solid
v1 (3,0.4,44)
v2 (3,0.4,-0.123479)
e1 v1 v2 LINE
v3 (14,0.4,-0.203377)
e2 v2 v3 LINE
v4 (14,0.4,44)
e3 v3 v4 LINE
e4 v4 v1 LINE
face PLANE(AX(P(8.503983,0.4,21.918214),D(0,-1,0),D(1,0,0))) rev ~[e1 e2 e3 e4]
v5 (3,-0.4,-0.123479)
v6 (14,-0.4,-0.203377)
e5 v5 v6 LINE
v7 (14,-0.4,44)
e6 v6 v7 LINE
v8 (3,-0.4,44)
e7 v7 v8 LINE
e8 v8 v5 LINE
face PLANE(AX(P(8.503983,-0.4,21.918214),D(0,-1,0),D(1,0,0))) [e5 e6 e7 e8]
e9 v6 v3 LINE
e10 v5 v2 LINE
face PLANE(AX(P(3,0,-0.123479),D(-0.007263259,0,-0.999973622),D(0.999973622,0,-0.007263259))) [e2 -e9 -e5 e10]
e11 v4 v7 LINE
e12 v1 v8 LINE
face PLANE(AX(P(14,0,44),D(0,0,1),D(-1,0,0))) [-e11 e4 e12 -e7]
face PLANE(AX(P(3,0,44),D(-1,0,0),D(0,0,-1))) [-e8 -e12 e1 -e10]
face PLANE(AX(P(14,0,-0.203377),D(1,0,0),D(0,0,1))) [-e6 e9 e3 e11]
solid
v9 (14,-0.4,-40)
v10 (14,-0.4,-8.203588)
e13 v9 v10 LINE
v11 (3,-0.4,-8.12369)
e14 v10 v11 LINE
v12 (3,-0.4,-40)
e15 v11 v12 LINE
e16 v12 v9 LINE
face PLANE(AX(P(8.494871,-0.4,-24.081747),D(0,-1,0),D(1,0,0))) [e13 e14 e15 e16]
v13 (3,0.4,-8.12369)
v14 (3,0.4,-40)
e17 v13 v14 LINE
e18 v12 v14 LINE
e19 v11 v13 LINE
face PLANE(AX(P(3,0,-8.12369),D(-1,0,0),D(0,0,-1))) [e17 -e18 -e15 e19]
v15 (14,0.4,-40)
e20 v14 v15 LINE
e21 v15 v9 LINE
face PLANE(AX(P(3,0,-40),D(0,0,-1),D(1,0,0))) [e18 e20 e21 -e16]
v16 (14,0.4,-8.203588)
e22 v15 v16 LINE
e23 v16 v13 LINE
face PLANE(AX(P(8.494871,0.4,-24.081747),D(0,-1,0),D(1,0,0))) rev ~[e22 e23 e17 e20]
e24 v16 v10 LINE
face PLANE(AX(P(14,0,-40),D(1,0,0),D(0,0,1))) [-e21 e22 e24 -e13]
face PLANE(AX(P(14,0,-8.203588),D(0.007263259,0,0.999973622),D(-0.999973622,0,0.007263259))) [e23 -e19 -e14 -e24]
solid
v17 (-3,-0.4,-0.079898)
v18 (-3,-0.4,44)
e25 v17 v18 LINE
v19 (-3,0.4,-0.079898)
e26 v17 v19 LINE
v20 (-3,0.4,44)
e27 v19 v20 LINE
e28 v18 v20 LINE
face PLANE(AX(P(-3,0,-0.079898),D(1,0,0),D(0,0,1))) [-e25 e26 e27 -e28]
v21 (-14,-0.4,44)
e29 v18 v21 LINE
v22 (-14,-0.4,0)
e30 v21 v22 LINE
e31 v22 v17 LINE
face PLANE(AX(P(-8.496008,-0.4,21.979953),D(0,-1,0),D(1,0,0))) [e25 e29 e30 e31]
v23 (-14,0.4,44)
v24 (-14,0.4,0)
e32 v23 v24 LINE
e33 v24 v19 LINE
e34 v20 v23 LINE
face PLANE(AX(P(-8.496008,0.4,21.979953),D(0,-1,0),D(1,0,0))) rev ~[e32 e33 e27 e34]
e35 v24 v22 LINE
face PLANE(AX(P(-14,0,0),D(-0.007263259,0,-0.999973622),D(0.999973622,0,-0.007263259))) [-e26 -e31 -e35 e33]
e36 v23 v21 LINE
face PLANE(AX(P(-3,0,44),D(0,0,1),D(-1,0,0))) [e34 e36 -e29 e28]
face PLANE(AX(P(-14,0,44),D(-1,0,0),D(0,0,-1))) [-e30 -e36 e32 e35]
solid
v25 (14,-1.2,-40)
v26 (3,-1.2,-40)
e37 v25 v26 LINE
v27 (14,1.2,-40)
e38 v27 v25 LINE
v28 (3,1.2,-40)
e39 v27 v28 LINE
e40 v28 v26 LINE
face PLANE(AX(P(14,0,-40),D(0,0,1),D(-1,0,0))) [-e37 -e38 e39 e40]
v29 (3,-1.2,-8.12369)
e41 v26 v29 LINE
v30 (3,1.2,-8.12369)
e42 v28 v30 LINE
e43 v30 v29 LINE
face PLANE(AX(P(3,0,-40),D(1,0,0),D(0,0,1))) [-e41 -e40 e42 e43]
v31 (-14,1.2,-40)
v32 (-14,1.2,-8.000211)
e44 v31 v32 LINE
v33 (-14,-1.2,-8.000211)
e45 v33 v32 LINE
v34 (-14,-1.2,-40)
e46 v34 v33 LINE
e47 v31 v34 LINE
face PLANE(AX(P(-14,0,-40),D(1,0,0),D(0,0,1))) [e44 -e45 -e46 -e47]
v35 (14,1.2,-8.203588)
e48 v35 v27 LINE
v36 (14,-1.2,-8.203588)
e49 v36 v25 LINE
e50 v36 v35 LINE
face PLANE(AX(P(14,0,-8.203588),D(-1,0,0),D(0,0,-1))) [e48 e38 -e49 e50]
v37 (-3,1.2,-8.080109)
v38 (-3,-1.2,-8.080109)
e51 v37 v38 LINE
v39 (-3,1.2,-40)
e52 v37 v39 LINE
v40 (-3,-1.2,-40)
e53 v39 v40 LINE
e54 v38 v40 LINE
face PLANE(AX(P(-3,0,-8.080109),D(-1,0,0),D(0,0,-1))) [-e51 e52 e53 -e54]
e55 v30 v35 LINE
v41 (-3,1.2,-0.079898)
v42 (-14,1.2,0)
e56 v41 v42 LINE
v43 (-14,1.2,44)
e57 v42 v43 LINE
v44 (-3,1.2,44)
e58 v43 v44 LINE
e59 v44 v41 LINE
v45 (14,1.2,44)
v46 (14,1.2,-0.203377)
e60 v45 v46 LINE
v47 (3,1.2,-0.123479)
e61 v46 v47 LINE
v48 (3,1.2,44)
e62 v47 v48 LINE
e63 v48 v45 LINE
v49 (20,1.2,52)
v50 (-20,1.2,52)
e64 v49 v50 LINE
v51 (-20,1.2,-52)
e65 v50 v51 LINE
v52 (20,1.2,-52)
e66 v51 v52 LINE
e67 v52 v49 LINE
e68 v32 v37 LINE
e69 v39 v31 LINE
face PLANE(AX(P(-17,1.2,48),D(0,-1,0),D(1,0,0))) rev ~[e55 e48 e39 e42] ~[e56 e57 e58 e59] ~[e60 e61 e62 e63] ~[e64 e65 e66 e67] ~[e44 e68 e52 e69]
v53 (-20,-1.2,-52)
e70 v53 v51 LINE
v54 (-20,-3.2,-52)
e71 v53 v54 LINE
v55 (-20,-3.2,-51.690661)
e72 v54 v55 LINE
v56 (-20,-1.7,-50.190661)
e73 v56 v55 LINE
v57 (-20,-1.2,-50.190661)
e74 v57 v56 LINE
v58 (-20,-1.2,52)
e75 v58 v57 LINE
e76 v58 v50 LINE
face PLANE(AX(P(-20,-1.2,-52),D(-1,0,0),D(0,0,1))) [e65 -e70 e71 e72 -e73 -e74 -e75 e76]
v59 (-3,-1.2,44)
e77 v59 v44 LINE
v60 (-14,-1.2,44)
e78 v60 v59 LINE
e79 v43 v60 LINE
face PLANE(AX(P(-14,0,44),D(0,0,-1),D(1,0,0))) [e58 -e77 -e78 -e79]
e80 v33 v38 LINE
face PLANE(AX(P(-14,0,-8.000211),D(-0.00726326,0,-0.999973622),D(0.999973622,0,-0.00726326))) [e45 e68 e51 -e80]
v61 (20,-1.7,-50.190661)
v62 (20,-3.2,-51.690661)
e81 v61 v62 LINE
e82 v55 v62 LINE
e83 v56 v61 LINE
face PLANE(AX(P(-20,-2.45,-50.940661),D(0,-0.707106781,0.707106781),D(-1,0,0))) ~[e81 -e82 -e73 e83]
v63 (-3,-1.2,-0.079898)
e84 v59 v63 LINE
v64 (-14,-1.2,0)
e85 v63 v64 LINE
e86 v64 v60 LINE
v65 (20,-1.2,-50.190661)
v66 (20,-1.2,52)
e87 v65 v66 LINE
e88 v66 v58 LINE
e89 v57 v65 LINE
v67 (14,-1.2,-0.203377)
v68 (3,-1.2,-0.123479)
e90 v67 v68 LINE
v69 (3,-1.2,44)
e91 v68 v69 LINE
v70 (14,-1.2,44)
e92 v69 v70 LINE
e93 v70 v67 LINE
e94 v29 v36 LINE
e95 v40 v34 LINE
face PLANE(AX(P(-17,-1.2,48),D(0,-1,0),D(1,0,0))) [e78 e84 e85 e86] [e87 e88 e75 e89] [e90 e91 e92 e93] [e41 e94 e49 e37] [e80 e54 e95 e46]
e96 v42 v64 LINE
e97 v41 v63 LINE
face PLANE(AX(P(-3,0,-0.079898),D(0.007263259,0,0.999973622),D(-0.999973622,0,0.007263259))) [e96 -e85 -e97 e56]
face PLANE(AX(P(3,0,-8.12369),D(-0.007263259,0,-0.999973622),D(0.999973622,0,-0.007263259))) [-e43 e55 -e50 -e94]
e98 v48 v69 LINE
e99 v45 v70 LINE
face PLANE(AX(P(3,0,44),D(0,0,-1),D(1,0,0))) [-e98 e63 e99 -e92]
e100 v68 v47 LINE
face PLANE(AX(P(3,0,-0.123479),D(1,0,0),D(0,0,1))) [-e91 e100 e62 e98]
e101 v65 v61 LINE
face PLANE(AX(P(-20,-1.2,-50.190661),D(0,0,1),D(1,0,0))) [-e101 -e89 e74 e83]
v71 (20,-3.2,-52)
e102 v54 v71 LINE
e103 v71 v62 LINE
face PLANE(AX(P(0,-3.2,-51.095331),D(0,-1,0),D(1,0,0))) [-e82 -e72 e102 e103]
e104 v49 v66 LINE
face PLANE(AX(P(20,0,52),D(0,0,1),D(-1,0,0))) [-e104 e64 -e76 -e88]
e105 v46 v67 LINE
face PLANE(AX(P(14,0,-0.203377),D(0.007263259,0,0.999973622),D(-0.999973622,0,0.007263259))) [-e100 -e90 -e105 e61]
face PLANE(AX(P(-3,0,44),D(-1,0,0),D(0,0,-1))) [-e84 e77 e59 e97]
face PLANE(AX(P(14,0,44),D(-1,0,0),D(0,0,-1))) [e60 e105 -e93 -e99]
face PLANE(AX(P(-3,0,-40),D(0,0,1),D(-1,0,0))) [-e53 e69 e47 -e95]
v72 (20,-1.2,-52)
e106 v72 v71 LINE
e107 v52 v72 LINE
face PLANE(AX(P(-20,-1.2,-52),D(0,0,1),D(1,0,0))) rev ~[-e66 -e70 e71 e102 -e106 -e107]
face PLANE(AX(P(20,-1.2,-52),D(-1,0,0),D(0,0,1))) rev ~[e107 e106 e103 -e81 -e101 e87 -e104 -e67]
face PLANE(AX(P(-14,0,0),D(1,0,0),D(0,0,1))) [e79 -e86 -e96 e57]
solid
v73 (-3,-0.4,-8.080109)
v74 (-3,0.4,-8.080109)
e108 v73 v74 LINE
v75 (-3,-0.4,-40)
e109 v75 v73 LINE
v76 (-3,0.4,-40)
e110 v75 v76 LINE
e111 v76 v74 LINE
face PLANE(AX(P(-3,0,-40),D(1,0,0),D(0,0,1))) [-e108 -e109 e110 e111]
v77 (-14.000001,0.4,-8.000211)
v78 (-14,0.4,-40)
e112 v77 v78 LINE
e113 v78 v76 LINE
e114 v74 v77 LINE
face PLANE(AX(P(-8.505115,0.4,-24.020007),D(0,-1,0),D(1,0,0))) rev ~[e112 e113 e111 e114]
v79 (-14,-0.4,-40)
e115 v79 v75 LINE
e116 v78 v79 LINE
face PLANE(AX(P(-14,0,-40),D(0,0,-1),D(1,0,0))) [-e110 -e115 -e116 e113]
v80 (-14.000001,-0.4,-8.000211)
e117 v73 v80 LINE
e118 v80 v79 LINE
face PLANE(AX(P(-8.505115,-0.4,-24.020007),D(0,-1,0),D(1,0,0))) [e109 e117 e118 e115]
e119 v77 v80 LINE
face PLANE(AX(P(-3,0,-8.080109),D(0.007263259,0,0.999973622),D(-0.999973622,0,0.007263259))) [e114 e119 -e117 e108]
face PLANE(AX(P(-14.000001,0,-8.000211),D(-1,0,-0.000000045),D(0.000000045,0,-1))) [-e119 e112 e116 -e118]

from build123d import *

# Parameters (mm, degrees)
F1_DEPTH      = 0.4
F1_DEPTH_BACK = 0.4
F0_W          = 6
F0_H          = 8
F0_H_2        = 12
F2_DEPTH      = 1.2
F2_DEPTH_BACK = 1.2
F3_W          = 40
F3_H          = 1.8093388975
F4_DEPTH      = 2
F5_SIZE       = 1.5


# Not quite as in the source:
# - ends of sketch curves that miss each other by under 0.0002 mm in the source are joined


with BuildPart() as f1:
    # F0 (on Front) → F1 (new body, two sides)
    with BuildSketch(Plane.XZ) as f1_sk:
        Polygon((-3, 44), (-14, 44), (-14, 0), (-3, -0.0798979561), align=None)
    extrude(amount=F1_DEPTH)
    extrude(f1_sk.sketch, amount=-F1_DEPTH_BACK)


with BuildPart() as f1b:
    # F0 (on Front) → F1, piece 2 (new body, two sides)
    with BuildSketch(Plane.XZ) as f1_2_sk:
        Polygon((14, -0.2033766155), (14, 44), (3, 44), (3, -0.1234786594), align=None)
    extrude(amount=F1_DEPTH)
    extrude(f1_2_sk.sketch, amount=-F1_DEPTH_BACK)


with BuildPart() as f1c:
    # F0 (on Front) → F1, piece 3 (new body, two sides)
    with BuildSketch(Plane.XZ) as f1_3_sk:
        Polygon((-3, -8.0801089842), (-14.0000014294, -8.0002110177), (-14, -40), (-3, -40), align=None)
    extrude(amount=F1_DEPTH)
    extrude(f1_3_sk.sketch, amount=-F1_DEPTH_BACK)


with BuildPart() as f1d:
    # F0 (on Front) → F1, piece 4 (new body, two sides)
    with BuildSketch(Plane.XZ) as f1_4_sk:
        Polygon((3, -40), (14, -40), (14, -8.2035876436), (3, -8.1236896875), align=None)
    extrude(amount=F1_DEPTH)
    extrude(f1_4_sk.sketch, amount=-F1_DEPTH_BACK)


with BuildPart() as f2:
    # F0 (on Front) → F2 (new body, two sides)
    with BuildSketch(Plane.XZ) as f2_sk:
        with Locations((-17, 48)):
            Rectangle(F0_W, F0_H)
        Polygon((14, 44), (14, 52), (-14, 52), (-14, 44), (-3, 44), (3, 44), align=None)
        with Locations((17, 48)):
            Rectangle(F0_W, F0_H)
        Polygon((20, -40), (20, 44), (14, 44), (14, -0.2033766155), (14, -8.2035876436), (14, -40), align=None)
        Polygon((3, -0.1234786594), (3, 44), (-3, 44), (-3, -0.0798979561), align=None)
        Polygon((-14, 0), (-14, 44), (-20, 44), (-20, -40), (-14, -40), (-14, -8.0002110177), align=None)
        Polygon((-3, -0.0798979561), (-14, 0), (-14, -8.0002110177), (-3, -8.0801089842), align=None)
        Polygon((3, -8.1236896875), (3, -0.1234786594), (-3, -0.0798979561), (-3, -8.0801089842), align=None)
        Polygon((14, -8.2035876436), (14, -0.2033766155), (3, -0.1234786594), (3, -8.1236896875), align=None)
        Polygon((-3, -40), (3, -40), (3, -8.1236896875), (-3, -8.0801089842), align=None)
        with Locations((-17, -46)):
            Rectangle(F0_W, F0_H_2)
        Polygon((14, -52), (14, -40), (3, -40), (-3, -40), (-14, -40), (-14, -52), align=None)
        with Locations((17, -46)):
            Rectangle(F0_W, F0_H_2)
    extrude(amount=F2_DEPTH)
    extrude(f2_sk.sketch, amount=-F2_DEPTH_BACK)

    # F3 (on face) → F4 (join)
    with BuildSketch(Plane.XZ.offset(1.2)):
        with Locations((0, -51.0953305513)):
            Rectangle(F3_W, F3_H)
    extrude(amount=F4_DEPTH)

    # F5
    f5_edges = [f2.edges().sort_by_distance(p)[0] for p in [
        (0, -3.2, -50.190661),
    ]]
    chamfer(f5_edges, length=F5_SIZE)


solid = Compound([f1.part, f1b.part, f1c.part, f1d.part, f2.part])
